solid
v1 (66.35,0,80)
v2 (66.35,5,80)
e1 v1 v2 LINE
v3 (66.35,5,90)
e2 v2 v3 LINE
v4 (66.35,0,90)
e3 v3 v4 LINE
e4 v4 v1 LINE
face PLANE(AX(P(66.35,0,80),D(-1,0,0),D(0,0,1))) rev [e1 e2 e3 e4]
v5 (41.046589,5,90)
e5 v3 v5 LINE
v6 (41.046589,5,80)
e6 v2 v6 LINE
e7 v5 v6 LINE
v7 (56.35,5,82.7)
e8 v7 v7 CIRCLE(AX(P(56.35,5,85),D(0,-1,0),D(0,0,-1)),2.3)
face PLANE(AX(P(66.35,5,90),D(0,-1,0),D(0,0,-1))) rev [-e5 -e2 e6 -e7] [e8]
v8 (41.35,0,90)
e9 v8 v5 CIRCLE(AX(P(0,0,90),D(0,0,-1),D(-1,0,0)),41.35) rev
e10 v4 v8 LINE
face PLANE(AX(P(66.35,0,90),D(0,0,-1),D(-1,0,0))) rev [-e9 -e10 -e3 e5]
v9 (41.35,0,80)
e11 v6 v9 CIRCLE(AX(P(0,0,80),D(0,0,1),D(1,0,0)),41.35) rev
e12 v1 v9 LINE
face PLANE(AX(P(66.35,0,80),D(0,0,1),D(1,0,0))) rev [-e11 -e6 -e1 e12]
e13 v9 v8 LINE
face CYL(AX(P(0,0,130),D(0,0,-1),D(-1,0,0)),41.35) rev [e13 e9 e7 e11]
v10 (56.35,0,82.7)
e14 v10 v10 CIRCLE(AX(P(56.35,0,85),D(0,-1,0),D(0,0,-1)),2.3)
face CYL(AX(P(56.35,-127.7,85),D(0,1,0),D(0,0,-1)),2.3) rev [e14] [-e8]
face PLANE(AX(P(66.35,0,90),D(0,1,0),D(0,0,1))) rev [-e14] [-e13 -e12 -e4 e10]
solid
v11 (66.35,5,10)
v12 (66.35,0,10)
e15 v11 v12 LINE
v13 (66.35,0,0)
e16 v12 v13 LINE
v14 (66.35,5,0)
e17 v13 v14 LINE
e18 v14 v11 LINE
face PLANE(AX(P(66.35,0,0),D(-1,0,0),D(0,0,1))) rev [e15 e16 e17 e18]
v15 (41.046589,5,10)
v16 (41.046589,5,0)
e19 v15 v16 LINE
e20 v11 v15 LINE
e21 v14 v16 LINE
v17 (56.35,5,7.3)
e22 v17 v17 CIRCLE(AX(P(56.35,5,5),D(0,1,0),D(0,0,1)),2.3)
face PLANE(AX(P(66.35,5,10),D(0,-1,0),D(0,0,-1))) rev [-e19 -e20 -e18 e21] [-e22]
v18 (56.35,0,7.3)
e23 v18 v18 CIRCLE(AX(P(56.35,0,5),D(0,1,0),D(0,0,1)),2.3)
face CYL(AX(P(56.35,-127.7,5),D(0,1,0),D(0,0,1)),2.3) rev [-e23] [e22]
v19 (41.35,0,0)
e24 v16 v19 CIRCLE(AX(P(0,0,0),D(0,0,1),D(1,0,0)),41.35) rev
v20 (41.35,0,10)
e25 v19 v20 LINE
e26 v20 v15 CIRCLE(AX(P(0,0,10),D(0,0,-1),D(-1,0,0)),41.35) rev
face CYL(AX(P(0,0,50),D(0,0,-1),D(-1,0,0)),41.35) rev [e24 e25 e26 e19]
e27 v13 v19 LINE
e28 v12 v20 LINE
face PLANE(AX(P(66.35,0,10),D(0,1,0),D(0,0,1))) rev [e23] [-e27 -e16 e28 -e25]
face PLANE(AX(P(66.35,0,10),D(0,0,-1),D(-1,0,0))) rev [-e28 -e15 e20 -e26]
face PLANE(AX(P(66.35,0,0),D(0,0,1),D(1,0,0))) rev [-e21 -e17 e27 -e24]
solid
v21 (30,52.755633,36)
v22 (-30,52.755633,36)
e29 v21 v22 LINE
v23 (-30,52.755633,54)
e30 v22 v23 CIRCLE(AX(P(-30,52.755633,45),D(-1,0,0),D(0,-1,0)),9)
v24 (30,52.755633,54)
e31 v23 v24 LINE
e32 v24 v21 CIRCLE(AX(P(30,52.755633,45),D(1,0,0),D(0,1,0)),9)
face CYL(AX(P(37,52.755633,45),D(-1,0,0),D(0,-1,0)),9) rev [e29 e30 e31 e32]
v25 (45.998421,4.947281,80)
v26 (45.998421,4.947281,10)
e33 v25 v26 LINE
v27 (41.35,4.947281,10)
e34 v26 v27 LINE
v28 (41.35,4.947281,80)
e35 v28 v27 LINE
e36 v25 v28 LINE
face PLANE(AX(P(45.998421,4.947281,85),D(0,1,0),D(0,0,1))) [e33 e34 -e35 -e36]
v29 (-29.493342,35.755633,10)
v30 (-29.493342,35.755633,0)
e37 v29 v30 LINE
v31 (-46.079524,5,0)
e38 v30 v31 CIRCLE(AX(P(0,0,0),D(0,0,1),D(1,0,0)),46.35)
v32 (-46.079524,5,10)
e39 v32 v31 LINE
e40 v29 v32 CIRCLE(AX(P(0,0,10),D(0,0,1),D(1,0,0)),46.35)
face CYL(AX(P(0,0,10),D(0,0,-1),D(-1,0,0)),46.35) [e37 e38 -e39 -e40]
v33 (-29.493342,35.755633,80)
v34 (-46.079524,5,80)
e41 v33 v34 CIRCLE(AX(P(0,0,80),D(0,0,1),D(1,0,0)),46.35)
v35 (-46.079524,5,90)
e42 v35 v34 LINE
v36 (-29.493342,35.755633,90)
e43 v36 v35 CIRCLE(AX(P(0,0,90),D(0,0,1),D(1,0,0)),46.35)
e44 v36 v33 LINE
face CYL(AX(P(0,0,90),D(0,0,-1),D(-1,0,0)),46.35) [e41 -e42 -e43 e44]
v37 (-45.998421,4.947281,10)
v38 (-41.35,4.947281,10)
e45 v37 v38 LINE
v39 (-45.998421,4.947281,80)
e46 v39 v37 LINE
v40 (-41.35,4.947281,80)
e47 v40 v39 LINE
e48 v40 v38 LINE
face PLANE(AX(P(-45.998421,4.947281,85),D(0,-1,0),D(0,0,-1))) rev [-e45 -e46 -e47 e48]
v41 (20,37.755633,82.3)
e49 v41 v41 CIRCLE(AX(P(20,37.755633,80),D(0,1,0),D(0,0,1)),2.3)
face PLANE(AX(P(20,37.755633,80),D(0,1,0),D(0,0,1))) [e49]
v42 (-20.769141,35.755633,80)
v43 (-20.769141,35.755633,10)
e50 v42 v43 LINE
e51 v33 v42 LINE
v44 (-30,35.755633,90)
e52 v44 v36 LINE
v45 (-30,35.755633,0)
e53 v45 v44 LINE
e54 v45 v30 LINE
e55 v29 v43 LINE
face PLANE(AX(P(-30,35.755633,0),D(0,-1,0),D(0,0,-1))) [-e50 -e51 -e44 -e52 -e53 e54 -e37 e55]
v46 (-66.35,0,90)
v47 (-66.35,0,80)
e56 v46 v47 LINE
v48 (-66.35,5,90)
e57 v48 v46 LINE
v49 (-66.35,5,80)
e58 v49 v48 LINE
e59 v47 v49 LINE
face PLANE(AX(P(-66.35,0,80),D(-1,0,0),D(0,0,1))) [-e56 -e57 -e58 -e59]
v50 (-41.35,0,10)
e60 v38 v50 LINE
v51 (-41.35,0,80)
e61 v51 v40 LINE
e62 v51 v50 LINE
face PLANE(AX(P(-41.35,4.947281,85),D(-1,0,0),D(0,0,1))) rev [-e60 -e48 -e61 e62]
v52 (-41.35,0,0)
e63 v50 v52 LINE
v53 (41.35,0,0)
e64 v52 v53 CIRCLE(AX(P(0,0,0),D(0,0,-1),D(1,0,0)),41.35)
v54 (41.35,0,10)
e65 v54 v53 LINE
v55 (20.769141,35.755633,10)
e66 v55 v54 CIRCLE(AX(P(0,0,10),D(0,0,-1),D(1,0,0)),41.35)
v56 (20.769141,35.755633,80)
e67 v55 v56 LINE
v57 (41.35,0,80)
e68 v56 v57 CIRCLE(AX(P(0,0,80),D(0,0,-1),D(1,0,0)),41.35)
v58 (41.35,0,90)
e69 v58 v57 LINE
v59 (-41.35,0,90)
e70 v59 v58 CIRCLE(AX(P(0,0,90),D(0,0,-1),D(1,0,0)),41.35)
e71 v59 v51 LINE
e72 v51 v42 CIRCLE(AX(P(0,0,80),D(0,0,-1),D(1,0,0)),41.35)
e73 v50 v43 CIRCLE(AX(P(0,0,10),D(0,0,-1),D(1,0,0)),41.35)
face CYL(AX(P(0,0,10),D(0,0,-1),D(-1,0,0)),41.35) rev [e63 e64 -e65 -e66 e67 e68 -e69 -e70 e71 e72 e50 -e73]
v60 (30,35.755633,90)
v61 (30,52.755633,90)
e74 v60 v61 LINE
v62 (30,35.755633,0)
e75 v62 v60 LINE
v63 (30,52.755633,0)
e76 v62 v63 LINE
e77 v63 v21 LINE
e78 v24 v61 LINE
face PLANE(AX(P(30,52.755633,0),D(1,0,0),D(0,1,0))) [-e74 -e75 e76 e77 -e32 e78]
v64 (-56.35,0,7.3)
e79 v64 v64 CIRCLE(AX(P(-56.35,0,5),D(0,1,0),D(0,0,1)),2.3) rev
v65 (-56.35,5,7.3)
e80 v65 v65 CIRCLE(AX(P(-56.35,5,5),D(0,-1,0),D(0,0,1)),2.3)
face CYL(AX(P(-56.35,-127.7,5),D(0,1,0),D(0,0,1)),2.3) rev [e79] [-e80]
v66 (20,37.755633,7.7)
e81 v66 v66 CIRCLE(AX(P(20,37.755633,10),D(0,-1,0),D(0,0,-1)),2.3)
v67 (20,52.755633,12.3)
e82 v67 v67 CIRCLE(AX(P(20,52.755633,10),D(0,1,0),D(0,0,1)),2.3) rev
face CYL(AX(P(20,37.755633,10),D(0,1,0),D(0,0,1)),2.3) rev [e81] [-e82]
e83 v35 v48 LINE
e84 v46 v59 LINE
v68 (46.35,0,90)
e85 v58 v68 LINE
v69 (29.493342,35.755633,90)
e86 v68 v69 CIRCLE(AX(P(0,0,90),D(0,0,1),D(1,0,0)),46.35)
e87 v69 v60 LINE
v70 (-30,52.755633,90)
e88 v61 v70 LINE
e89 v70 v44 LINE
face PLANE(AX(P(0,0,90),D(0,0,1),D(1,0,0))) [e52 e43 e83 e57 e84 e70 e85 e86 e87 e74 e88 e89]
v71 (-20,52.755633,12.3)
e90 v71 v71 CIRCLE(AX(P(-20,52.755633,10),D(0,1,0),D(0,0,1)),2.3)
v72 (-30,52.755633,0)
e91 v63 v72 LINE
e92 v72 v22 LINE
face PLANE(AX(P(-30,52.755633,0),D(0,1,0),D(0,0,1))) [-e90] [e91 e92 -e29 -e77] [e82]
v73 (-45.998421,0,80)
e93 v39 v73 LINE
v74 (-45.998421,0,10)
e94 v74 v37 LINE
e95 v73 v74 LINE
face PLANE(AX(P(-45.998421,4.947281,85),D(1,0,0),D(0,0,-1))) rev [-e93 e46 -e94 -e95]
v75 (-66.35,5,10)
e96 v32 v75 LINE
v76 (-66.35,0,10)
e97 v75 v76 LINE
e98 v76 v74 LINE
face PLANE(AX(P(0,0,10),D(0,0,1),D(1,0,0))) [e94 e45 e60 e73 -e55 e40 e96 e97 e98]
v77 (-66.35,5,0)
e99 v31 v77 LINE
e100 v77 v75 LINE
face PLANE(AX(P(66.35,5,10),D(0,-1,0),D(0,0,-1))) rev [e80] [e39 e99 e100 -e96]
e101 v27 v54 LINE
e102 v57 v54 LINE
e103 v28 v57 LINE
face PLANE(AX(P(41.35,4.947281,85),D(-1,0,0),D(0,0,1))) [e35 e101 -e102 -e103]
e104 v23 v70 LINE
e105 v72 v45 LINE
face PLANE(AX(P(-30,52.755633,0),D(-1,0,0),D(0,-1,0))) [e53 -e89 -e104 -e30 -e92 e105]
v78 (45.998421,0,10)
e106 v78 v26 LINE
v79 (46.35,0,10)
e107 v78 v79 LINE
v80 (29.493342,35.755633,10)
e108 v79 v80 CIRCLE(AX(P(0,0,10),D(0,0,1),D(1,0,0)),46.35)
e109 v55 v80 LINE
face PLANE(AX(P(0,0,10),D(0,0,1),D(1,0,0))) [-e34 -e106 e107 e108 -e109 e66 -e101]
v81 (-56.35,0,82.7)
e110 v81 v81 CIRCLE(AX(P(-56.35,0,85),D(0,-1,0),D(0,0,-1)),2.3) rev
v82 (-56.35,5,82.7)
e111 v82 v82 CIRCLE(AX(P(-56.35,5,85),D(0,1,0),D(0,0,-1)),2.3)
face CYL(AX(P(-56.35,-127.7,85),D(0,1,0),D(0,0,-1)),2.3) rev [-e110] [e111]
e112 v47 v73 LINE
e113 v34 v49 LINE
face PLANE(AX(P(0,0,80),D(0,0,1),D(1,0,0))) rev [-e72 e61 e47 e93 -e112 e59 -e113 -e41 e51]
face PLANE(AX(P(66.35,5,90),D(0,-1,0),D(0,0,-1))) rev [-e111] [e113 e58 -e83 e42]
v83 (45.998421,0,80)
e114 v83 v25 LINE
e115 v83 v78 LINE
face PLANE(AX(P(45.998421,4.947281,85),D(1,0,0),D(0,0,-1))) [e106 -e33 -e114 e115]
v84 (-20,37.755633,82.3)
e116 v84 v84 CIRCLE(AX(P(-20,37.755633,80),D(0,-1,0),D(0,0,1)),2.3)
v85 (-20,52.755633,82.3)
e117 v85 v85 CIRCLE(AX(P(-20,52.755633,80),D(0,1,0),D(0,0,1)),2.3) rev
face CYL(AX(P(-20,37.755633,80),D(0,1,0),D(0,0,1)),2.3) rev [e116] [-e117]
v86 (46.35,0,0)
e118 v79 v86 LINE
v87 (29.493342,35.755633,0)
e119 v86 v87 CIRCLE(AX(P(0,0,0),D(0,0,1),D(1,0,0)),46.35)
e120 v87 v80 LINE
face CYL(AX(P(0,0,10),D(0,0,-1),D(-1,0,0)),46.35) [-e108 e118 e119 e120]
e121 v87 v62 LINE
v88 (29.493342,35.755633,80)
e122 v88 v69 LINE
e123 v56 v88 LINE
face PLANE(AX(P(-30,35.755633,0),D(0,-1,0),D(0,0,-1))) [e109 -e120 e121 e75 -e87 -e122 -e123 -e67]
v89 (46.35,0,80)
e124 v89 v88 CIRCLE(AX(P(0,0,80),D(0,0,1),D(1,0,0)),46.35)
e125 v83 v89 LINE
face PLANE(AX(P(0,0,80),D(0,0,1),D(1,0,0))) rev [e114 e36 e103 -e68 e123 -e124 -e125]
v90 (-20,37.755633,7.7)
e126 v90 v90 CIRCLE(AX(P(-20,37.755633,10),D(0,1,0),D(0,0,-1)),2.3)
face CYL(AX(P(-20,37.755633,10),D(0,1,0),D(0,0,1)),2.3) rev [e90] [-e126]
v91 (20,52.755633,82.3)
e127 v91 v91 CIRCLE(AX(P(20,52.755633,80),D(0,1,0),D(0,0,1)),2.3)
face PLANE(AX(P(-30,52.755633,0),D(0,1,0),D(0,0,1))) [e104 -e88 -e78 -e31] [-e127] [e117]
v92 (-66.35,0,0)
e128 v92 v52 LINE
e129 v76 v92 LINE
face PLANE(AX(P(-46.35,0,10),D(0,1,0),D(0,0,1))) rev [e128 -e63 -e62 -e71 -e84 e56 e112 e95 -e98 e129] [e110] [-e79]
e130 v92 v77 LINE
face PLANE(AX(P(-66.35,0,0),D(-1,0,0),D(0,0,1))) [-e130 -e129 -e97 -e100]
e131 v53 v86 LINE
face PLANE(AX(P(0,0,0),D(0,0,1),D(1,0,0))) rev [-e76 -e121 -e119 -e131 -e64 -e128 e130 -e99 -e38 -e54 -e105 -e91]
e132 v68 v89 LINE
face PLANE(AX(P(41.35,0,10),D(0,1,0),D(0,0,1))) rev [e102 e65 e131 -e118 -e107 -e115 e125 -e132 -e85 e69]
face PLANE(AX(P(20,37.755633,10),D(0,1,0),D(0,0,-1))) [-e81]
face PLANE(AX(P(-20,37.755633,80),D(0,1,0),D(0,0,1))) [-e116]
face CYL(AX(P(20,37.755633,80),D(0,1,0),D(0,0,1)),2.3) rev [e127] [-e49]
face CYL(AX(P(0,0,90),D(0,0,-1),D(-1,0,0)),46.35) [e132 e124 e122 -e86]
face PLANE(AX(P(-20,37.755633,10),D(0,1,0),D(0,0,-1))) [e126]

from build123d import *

# Parameters (mm, degrees)
BOSS_EXTRUDE1_DEPTH     = 10
SKETCH2_W               = 10
SKETCH2_H               = 5
BOSS_EXTRUDE2_DEPTH     = 66.35
SKETCH3_R               = 2.3
CUT_EXTRUDE1_DEPTH      = 132.7
SKETCH4_R               = 41.35
CUT_EXTRUDE3_DEPTH      = 50
LPATTERN4_START         = 80
LPATTERN4_DEPTH         = 10
LPATTERN4_2_DEPTH       = 10
LPATTERN4_3_DEPTH       = 10
MIRROR5_COPY_1_SKETCH_R = 2.3
MIRROR5_COPY_1_DEPTH    = 132.7
SKETCH8_W               = 4.648420871
SKETCH8_H               = 4.94728133
BOSS_EXTRUDE3_DEPTH     = 40
SKETCH11_W              = 60
SKETCH11_H              = 17
BOSS_EXTRUDE4_DEPTH     = 90
SKETCH12_R              = 41.35
CUT_EXTRUDE4_DEPTH      = 250
SKETCH14_R              = 2.3
CUT_EXTRUDE6_DEPTH      = 15
MIRROR8_COPY_1_SKETCH_R = 2.3
MIRROR8_COPY_1_DEPTH    = 15
SKETCH15_R              = 9
CUT_EXTRUDE7_DEPTH      = 67


# Read off the part's stored shape, not the designer's step: LPattern4
with BuildPart() as part:
    # Sketch1 → Boss-Extrude1 (new body)
    with BuildSketch(Plane.XY):
        with BuildLine():
            Line((-46.35, 0), (-41.35, 0))
            ThreePointArc((-41.35, 0), (0, 41.35), (41.35, 0))
            Line((41.35, 0), (46.35, 0))
            ThreePointArc((46.35, 0), (0, 46.35), (-46.35, 0))
        make_face()
    extrude(amount=BOSS_EXTRUDE1_DEPTH)



with BuildPart() as body_2:
    # Sketch2 → Boss-Extrude2 (new, symmetric)
    with BuildSketch(Plane(origin=(0, 0, 0), x_dir=(0, 0, -1), z_dir=(1, 0, 0))):
        with Locations((-5, 2.5)):
            Rectangle(SKETCH2_W, SKETCH2_H)
    extrude(amount=BOSS_EXTRUDE2_DEPTH, both=True)

    # Sketch3 → Cut-Extrude1 (cut)
    with BuildSketch(Plane(origin=(0, 5, 0), x_dir=(1, 0, 0), z_dir=(0, 1, 0))):
        with Locations(Location((56.35, -5, 0), (0, 0, 270))):
            Circle(SKETCH3_R)
    cut_extrude1 = extrude(amount=-CUT_EXTRUDE1_DEPTH, mode=Mode.SUBTRACT)

    # Mirror1: Cut-Extrude1 across plane
    add(cut_extrude1.mirror(Plane(origin=(0, 0, 0), x_dir=(0, 0, 1), z_dir=(1, 0, 0))), mode=Mode.SUBTRACT)

    # Sketch4 → Cut-Extrude3 (cut, symmetric)
    with BuildSketch(Plane.XY):
        Circle(SKETCH4_R)
    extrude(amount=CUT_EXTRUDE3_DEPTH, both=True, mode=Mode.SUBTRACT)


with BuildPart() as cut_extrude3_piece_1:
    # of the separate pieces the step leaves, piece 1, a body of its own (cut_extrude3_pieces)
    add(body_2.part.solids().sort_by_distance((-41.35, 0, 10))[0])


with BuildPart() as cut_extrude3_piece_2:
    # of the separate pieces the step leaves, piece 2, a body of its own (cut_extrude3_pieces)
    add(body_2.part.solids().sort_by_distance((66.35, 0, 10))[0])


with BuildPart() as body_4:
    # LPattern4 outline → LPattern4 (new body)
    with BuildSketch(Plane.XY.offset(LPATTERN4_START)):
        with BuildLine():
            Line((66.35, 0), (66.35, 5))
            Line((66.35, 5), (41.046589383, 5))
            ThreePointArc((41.046589383, 5), (41.274077646, 2.504598671), (41.35, 0))
            Line((41.35, 0), (66.35, 0))
        make_face()
    extrude(amount=LPATTERN4_DEPTH)

    # Mirror5: Cut-Extrude1 across plane
    add(cut_extrude1.mirror(Plane.XY.offset(45)), mode=Mode.SUBTRACT)


with BuildPart() as body_5:
    # LPattern4 2 outline → LPattern4 2 (new body)
    with BuildSketch(Plane.XY.offset(LPATTERN4_START)):
        with BuildLine():
            Line((-46.35, 0), (-41.35, 0))
            ThreePointArc((-41.35, 0), (0, 41.35), (41.35, 0))
            Line((41.35, 0), (46.35, 0))
            ThreePointArc((46.35, 0), (0, 46.35), (-46.35, 0))
        make_face()
    extrude(amount=LPATTERN4_2_DEPTH)


with BuildPart() as body_6:
    # LPattern4 3 outline → LPattern4 3 (new body)
    with BuildSketch(Plane.XY.offset(LPATTERN4_START)):
        with BuildLine():
            Line((-66.35, 0), (-41.35, 0))
            ThreePointArc((-41.35, 0), (-41.274077646, 2.504598671), (-41.046589383, 5))
            Line((-41.046589383, 5), (-66.35, 5))
            Line((-66.35, 5), (-66.35, 0))
        make_face()
    extrude(amount=LPATTERN4_3_DEPTH)

    # Mirror5 copy 1 sketch → Mirror5 copy 1 (cut)
    with BuildSketch(Plane(origin=(0, 5, 90), x_dir=(-1, 0, 0), z_dir=(0, 1, 0))):
        with Locations(Location((56.35, -5, 0), (0, 0, 270))):
            Circle(MIRROR5_COPY_1_SKETCH_R)
    extrude(amount=-MIRROR5_COPY_1_DEPTH, mode=Mode.SUBTRACT)


with BuildPart() as part_1:
    add(part.part)

    add(cut_extrude3_piece_1.part)  # Boss-Extrude3 merges Cut-Extrude3 piece 1

    add(body_5.part)  # Boss-Extrude3 merges body 5

    add(body_6.part)  # Boss-Extrude3 merges body 6
    # Sketch8 → Boss-Extrude3 (add, symmetric)
    with BuildSketch(Plane.XY.offset(45)):
        with Locations((-43.674210436, 2.473640665)):
            Rectangle(SKETCH8_W, SKETCH8_H)
    boss_extrude3 = extrude(amount=BOSS_EXTRUDE3_DEPTH, both=True)

    # Mirror6: Boss-Extrude3 across plane
    add(boss_extrude3.mirror(Plane(origin=(0, 0, 0), x_dir=(0, 0, 1), z_dir=(1, 0, 0))))

    # Sketch11 → Boss-Extrude4 (add)
    with BuildSketch(Plane.XY.offset(90)):
        with Locations((0, 44.255632839)):
            Rectangle(SKETCH11_W, SKETCH11_H)
    extrude(amount=-BOSS_EXTRUDE4_DEPTH)

    # Sketch12 → Cut-Extrude4 (cut, symmetric)
    with BuildSketch(Plane.XY.offset(90)):
        Circle(SKETCH12_R)
    extrude(amount=CUT_EXTRUDE4_DEPTH, both=True, mode=Mode.SUBTRACT)

    # Sketch14 → Cut-Extrude6 (cut, symmetric)
    with BuildSketch(Plane(origin=(0, 52.755632839, 0), x_dir=(1, 0, 0), z_dir=(0, 1, 0))):
        with Locations(Location((20, -80, 0), (0, 0, 270))):
            Circle(SKETCH14_R)
    cut_extrude6 = extrude(amount=CUT_EXTRUDE6_DEPTH, both=True, mode=Mode.SUBTRACT)

    # Mirror7: Cut-Extrude6 across plane
    add(cut_extrude6.mirror(Plane(origin=(0, 0, 0), x_dir=(0, 0, 1), z_dir=(1, 0, 0))), mode=Mode.SUBTRACT)

    # Mirror8: Cut-Extrude6 across plane
    add(cut_extrude6.mirror(Plane.XY.offset(45)), mode=Mode.SUBTRACT)

    # Mirror8 copy 1 sketch → Mirror8 copy 1 (cut, symmetric)
    with BuildSketch(Plane(origin=(0, 52.755632839, 90), x_dir=(-1, 0, 0), z_dir=(0, 1, 0))):
        with Locations(Location((20, -80, 0), (0, 0, 270))):
            Circle(MIRROR8_COPY_1_SKETCH_R)
    extrude(amount=MIRROR8_COPY_1_DEPTH, both=True, mode=Mode.SUBTRACT)

    # Sketch15 → Cut-Extrude7 (cut)
    with BuildSketch(Plane.ZY.offset(30)):
        with Locations((45, 52.755632839)):
            Circle(SKETCH15_R)
    extrude(amount=-CUT_EXTRUDE7_DEPTH, mode=Mode.SUBTRACT)


solid = Compound([cut_extrude3_piece_2.part, body_4.part, part_1.part])
